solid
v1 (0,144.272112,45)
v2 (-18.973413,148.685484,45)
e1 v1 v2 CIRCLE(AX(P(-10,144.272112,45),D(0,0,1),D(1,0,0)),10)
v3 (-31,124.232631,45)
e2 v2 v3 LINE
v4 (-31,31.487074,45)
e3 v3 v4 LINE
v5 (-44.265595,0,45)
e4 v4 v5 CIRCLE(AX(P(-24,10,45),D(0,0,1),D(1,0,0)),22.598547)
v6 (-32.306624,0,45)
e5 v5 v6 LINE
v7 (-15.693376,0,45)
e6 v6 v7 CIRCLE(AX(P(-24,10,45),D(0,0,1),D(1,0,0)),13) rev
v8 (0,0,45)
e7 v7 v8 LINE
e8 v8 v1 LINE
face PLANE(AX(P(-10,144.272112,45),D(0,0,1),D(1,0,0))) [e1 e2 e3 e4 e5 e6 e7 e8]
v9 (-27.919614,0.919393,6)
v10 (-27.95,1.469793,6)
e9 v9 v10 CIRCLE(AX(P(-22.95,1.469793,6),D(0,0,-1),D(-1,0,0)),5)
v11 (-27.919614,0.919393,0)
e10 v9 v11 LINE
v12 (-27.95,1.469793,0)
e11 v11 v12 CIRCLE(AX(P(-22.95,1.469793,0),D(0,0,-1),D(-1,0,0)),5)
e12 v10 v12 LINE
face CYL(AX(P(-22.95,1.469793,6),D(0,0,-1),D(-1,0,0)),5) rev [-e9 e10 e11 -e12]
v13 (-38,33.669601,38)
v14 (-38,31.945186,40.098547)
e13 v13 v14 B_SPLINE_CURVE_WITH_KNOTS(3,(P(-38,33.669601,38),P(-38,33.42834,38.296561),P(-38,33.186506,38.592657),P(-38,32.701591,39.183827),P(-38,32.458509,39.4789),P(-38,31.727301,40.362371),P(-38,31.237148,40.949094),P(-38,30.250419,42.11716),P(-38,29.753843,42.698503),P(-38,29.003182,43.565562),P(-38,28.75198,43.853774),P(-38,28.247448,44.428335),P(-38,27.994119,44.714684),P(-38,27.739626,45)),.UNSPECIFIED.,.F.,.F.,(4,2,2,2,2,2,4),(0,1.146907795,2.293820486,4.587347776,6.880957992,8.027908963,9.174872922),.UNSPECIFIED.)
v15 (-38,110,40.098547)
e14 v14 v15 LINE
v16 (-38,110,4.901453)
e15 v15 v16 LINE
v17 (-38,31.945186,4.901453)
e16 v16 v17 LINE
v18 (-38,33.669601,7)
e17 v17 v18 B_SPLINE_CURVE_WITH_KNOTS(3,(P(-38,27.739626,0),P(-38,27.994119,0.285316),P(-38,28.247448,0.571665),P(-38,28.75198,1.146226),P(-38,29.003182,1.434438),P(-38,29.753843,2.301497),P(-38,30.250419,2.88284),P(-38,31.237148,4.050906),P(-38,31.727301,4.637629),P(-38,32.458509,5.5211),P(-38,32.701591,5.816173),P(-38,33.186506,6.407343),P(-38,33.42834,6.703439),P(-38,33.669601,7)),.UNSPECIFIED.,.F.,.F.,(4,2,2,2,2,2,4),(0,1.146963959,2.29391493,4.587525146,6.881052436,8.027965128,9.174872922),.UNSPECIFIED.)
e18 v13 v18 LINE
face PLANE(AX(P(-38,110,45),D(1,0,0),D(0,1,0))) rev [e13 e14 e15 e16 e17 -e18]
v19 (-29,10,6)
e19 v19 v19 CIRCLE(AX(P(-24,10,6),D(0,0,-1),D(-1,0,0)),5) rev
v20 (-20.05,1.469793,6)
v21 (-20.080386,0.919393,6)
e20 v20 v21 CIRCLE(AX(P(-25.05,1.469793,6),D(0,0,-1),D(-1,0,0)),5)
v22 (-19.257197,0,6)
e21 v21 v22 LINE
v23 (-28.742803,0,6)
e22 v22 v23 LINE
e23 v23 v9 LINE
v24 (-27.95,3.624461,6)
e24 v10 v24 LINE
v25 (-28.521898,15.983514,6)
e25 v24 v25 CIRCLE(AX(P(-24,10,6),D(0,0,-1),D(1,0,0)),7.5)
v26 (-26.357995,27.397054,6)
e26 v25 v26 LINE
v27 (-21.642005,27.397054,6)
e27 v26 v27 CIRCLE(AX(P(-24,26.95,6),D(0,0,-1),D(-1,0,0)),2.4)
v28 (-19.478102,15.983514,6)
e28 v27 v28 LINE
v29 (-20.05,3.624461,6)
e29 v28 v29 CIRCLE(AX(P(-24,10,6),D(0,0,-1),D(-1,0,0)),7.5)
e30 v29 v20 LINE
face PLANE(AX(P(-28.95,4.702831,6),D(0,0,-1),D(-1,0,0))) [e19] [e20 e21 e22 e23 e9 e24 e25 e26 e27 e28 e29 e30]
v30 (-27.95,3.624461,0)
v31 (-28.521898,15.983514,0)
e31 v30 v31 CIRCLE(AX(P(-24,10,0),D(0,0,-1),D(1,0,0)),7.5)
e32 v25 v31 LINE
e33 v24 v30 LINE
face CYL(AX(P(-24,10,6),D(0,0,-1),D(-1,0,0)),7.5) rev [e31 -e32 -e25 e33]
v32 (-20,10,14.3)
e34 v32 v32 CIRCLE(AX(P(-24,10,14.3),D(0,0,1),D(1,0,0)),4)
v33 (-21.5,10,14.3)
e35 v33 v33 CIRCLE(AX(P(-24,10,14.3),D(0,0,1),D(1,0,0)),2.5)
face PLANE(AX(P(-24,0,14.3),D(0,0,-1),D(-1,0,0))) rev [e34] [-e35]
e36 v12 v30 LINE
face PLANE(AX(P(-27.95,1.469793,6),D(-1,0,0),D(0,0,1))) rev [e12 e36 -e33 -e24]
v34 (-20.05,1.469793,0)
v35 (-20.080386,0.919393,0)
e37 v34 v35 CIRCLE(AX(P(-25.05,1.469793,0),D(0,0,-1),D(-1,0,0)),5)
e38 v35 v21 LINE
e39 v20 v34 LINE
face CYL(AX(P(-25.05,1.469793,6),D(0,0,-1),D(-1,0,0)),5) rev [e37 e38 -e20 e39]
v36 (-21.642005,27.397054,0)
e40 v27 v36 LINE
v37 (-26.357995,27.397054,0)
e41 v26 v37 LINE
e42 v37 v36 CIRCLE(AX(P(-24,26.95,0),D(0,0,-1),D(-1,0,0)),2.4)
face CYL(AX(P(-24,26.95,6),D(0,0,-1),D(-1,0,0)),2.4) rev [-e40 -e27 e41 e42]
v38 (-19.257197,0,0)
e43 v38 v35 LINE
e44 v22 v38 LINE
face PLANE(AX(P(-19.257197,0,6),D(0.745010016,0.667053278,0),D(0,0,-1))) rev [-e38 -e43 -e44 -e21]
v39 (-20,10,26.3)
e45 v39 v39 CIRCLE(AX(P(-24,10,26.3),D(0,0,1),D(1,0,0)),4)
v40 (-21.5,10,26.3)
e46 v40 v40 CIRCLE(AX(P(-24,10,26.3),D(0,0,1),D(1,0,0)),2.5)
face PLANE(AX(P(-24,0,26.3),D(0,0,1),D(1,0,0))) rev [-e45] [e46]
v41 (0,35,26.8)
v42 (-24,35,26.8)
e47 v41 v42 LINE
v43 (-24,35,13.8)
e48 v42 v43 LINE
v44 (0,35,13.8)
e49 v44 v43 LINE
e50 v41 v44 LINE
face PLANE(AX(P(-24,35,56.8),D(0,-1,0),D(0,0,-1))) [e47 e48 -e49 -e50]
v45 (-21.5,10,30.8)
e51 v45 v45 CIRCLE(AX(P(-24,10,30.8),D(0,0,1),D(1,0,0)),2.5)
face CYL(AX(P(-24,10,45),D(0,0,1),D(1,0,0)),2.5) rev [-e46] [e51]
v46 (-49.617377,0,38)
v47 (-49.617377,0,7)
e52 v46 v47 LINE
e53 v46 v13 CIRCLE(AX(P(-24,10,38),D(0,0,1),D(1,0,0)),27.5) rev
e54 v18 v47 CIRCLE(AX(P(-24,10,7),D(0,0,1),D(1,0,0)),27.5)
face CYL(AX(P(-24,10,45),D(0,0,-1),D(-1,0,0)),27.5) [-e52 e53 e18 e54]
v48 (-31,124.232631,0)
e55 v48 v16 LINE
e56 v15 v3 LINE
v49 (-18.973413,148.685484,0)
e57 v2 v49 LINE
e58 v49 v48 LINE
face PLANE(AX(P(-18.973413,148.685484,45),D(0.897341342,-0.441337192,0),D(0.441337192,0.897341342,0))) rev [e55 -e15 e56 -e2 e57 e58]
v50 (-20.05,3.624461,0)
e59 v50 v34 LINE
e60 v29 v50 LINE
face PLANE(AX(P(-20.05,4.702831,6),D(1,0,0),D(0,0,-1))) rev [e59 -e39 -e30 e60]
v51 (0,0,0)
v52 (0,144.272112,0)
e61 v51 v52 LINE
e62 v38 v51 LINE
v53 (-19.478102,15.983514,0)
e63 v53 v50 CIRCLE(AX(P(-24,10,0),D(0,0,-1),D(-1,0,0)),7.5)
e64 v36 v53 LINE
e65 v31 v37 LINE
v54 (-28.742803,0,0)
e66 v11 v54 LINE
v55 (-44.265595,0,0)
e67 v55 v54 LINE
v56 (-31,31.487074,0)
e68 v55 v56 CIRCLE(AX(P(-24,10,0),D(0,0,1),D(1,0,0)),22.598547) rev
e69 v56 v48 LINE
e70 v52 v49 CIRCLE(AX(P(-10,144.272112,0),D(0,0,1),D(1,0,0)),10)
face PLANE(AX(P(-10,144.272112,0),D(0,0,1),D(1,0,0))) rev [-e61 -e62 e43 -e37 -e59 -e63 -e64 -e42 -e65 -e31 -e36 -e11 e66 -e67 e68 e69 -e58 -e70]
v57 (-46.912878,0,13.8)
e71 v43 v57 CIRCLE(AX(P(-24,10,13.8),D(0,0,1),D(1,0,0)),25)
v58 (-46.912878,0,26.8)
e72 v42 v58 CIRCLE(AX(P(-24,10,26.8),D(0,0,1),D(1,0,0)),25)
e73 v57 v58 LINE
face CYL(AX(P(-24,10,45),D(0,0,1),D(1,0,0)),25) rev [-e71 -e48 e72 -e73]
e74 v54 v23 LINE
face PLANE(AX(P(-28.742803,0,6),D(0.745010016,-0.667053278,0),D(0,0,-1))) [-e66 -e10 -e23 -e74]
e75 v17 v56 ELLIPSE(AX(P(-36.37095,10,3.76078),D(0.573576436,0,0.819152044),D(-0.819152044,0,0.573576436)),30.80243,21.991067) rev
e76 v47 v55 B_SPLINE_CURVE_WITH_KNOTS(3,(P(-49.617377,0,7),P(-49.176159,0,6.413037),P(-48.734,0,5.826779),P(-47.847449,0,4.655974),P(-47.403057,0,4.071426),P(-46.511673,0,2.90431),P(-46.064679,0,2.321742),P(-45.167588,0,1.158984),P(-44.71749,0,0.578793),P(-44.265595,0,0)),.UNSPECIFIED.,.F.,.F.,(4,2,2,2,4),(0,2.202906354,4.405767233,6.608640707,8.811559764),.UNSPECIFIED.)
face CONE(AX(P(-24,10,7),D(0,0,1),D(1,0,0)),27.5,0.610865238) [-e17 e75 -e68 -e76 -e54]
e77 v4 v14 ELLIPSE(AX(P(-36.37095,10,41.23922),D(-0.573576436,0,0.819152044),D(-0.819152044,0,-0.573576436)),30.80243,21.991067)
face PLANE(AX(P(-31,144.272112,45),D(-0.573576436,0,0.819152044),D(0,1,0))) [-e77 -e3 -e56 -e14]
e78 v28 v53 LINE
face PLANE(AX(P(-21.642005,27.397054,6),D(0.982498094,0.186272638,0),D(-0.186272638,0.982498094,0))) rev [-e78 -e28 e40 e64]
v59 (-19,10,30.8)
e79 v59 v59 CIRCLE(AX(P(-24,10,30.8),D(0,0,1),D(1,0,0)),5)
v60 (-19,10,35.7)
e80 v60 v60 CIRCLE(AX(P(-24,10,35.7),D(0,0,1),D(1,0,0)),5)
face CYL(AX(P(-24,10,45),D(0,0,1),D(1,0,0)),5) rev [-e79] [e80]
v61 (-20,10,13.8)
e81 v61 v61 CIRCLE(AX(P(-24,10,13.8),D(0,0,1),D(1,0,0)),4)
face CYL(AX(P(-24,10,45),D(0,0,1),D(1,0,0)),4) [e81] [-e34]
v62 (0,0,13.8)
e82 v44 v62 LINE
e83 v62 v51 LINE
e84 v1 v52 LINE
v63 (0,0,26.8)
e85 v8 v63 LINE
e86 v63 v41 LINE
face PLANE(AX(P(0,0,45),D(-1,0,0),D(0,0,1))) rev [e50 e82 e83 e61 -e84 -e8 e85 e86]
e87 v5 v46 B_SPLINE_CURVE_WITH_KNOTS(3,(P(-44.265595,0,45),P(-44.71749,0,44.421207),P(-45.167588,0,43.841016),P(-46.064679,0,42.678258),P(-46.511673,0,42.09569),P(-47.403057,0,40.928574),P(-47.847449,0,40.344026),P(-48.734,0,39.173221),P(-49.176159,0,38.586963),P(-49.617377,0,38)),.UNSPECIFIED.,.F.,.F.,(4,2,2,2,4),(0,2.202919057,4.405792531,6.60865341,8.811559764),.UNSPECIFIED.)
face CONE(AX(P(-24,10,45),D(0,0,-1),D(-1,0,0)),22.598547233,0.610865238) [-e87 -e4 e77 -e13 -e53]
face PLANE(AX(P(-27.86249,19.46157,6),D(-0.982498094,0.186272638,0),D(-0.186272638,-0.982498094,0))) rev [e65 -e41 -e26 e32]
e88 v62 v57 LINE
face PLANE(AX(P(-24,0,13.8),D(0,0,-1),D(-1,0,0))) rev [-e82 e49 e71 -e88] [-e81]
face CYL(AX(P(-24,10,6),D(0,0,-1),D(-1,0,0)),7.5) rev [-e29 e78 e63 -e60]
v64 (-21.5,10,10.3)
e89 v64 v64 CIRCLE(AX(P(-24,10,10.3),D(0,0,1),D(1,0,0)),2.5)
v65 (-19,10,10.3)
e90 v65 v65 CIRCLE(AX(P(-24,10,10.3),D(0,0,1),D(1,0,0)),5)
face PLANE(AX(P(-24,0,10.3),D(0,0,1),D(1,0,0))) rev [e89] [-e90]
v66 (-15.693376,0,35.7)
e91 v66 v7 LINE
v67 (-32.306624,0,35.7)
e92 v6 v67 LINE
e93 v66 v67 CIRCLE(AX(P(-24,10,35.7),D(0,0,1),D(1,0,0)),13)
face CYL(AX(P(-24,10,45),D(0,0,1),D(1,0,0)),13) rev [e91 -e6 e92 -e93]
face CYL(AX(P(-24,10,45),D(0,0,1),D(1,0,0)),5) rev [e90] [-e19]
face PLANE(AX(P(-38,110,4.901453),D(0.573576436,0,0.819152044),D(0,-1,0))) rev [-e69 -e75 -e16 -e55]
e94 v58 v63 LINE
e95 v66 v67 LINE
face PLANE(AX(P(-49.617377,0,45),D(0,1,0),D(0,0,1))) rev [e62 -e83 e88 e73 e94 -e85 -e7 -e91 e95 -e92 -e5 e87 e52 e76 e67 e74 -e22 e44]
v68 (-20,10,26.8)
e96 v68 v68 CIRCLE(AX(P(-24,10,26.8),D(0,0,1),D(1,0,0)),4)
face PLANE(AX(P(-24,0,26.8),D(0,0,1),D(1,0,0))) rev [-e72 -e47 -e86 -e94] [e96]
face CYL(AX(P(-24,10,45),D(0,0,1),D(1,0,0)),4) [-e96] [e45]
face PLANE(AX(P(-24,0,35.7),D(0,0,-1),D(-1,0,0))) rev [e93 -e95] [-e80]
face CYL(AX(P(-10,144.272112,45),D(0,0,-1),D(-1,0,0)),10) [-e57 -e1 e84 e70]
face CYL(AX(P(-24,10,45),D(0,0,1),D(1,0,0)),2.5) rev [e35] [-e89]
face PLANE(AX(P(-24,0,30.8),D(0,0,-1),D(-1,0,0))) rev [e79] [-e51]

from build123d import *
from OCP.BRepFilletAPI import BRepFilletAPI_MakeChamfer

# Parameters (mm, degrees)
EXTRUDE_1_DEPTH     = 45
CHAMFER_1_SIZE      = 7
CHAMFER_1_SIZE2     = 4.901452767
CUT_EXTRUDE_START   = 13
CUT_EXTRUDE_1_DEPTH = 13
CUT_EXTRUDE_2_DEPTH = 6
CUT_EXTRUDE_3_DEPTH = 6
CHAMFER_START       = -1
CHAMFER_2_DEPTH     = 7
CHAMFER_3_SIZE      = 7
CHAMFER_3_SIZE2     = 4.901452767


with BuildPart() as part:
    # 草图1 → 凸台-拉伸1 (new body)
    with BuildSketch(Plane.XY):
        with BuildLine():
            Line((0, 0), (0, 144.272111773))
            ThreePointArc((0, 144.272111773), (-7.734402303, 154.012084416), (-18.973413415, 148.68548369))
            Line((-18.973413415, 148.68548369), (-38, 110))
            Line((-38, 110), (-38, 33.669600757))
            ThreePointArc((-38, 33.669600757), (-49.996050511, 18.969691065), (-49.617376915, 0))
            Line((-49.617376915, 0), (0, 0))
        make_face()
    extrude(amount=EXTRUDE_1_DEPTH)

    # 草图2 → 切除-旋转2 (revolve, cut)
    with BuildSketch(Plane(origin=(-24, 0, 0), x_dir=(0, 0, -1), z_dir=(1, 0, 0)), mode=Mode.PRIVATE) as cut_revolve_2_sk:
        Polygon((-45, 23), (-45, 10), (0, 10), (0, 15), (-4.3, 15), (-10.3, 15), (-10.3, 12.5), (-14.3, 12.5), (-14.3, 14), (-13.8, 14), (-13.8, 35), (-26.8, 35), (-26.8, 14), (-26.3, 14), (-26.3, 12.5), (-30.8, 12.5), (-30.8, 15), (-35.7, 15), (-35.7, 23), align=None)
    revolve(cut_revolve_2_sk.sketch.rotate(Axis((-24, 10, 45), (0, 0, -1)), 90), axis=Axis((-24, 10, 45), (0, 0, -1)), mode=Mode.SUBTRACT)

    # 倒角1
    chamfer_1_edges = [part.edges().sort_by_distance(p)[0] for p in [
        (-49.996050511, 18.969691065, 45),
        (-49.996050511, 18.969691065, 0),
    ]]
    chamfer_1_side = [part.faces().sort_by_distance(p)[0] for p in [
        (-49.996050511, 18.969691065, 22.5),
    ]]
    chamfer(chamfer_1_edges, length=CHAMFER_1_SIZE, length2=CHAMFER_1_SIZE2, reference=chamfer_1_side[0])

    # 草图4 → 切除-拉伸1 (cut)
    with BuildSketch(Plane.XY.offset(13.8).offset(CUT_EXTRUDE_START)):
        with BuildLine():
            Line((-24, 35), (0, 35))
            Line((0, 35), (0, 17))
            ThreePointArc((0, 17), (-9, 30), (-24, 35))
        make_face()
        with BuildLine():
            Line((-1.087121525, 0), (0, 0))
            Line((0, 0), (0, 3))
            ThreePointArc((0, 3), (-0.495648452, 1.482637832), (-1.087121525, 0))
        make_face()
    extrude(amount=-CUT_EXTRUDE_1_DEPTH, mode=Mode.SUBTRACT)

    # 草图7 → 切除-拉伸2 (cut)
    with BuildSketch(Plane(origin=(0, 0, 0), x_dir=(-1, 0, 0), z_dir=(0, 0, -1))):
        with BuildLine():
            Line((27.95, 1.469792729), (27.95, 4.702830945))
            ThreePointArc((27.95, 4.702830945), (28.032732694, 5.101103075), (28.267241379, 5.433474952))
            ThreePointArc((28.267241379, 5.433474952), (30.25, 10), (28.267241379, 14.566525048))
            ThreePointArc((28.267241379, 14.566525048), (28.032732694, 14.898896925), (27.95, 15.297169055))
            Line((27.95, 15.297169055), (27.95, 18.530207271))
            ThreePointArc((27.95, 18.530207271), (27.928074545, 18.997939916), (27.862490469, 19.46157046))
            Line((27.862490469, 19.46157046), (26.357995425, 27.397054331))
            ThreePointArc((26.357995425, 27.397054331), (24, 29.35), (21.642004575, 27.397054331))
            Line((21.642004575, 27.397054331), (20.137509531, 19.46157046))
            ThreePointArc((20.137509531, 19.46157046), (20.071925455, 18.997939916), (20.05, 18.530207271))
            Line((20.05, 18.530207271), (20.05, 15.297169055))
            ThreePointArc((20.05, 15.297169055), (19.967267306, 14.898896925), (19.732758621, 14.566525048))
            ThreePointArc((19.732758621, 14.566525048), (17.75, 10), (19.732758621, 5.433474952))
            ThreePointArc((19.732758621, 5.433474952), (19.967267306, 5.101103075), (20.05, 4.702830945))
            Line((20.05, 4.702830945), (20.05, 1.469792729))
            ThreePointArc((20.05, 1.469792729), (20.071925455, 1.002060084), (20.137509531, 0.53842954))
            Line((20.137509531, 0.53842954), (21.642004575, -7.397054331))
            ThreePointArc((21.642004575, -7.397054331), (24, -9.35), (26.357995425, -7.397054331))
            Line((26.357995425, -7.397054331), (27.862490469, 0.53842954))
            ThreePointArc((27.862490469, 0.53842954), (27.928074545, 1.002060084), (27.95, 1.469792729))
        make_face()
    extrude(amount=-CUT_EXTRUDE_2_DEPTH, mode=Mode.SUBTRACT)

    # 草图9 → 切除-拉伸3 (cut)
    with BuildSketch(Plane(origin=(0, 0, 0), x_dir=(-1, 0, 0), z_dir=(0, 0, -1))):
        with BuildLine():
            Line((20.137509531, 19.46157046), (19.478101846, 15.983513774))
            ThreePointArc((19.478101846, 15.983513774), (16.508016808, 9.653318796), (20.05, 3.624460807))
            Line((20.05, 3.624460807), (27.95, 3.624460807))
            ThreePointArc((27.95, 3.624460807), (31.491983192, 9.653318796), (28.521898154, 15.983513774))
            Line((28.521898154, 15.983513774), (27.862490469, 19.46157046))
            Line((27.862490469, 19.46157046), (20.137509531, 19.46157046))
        make_face()
    extrude(amount=-CUT_EXTRUDE_3_DEPTH, mode=Mode.SUBTRACT)

    # 倒角2: read off the stored shape, not the designer's step
    # 倒角2 outline → 倒角2 (cut)
    with BuildSketch(Plane.XY.offset(CHAMFER_START)):
        with BuildLine():
            Line((-20.239590839, 0), (-19.257196744, 0))
            Line((-19.257196744, 0), (-20.080386265, 0.919393486))
            ThreePointArc((-20.080386265, 0.919393486), (-20.105277636, 0.728361179), (-20.137509531, 0.53842954))
            Line((-20.137509531, 0.53842954), (-20.239590839, 0))
        make_face()
        with BuildLine():
            Line((-28.742803256, 0), (-27.760409161, 0))
            Line((-27.760409161, 0), (-27.862490469, 0.53842954))
            ThreePointArc((-27.862490469, 0.53842954), (-27.894722364, 0.728361179), (-27.919613735, 0.919393486))
            Line((-27.919613735, 0.919393486), (-28.742803256, 0))
        make_face()
    extrude(amount=CHAMFER_2_DEPTH, mode=Mode.SUBTRACT)

    # 倒角3: one chamfer whose edges measure the first distance from different faces: ONE call of the kernel's chamfer builder (chamfer() names one face for all edges)
    chamfer_3_edges_1 = [part.edges().sort_by_distance(p)[0] for p in [
        (-38, 68.86981309, 45),
    ]]
    chamfer_3_side_1 = [part.faces().sort_by_distance(p)[0] for p in [
        (-18.29172725, 74.905702605, 45),
    ]]
    chamfer_3_edges_2 = [part.edges().sort_by_distance(p)[0] for p in [
        (-38, 68.86981309, 0),
    ]]
    chamfer_3_side_2 = [part.faces().sort_by_distance(p)[0] for p in [
        (-18.531236566, 72.11524923, 0),
    ]]
    chamfer_3 = BRepFilletAPI_MakeChamfer(part.part.solid().wrapped)
    for e in chamfer_3_edges_1:
        chamfer_3.Add(CHAMFER_3_SIZE, CHAMFER_3_SIZE2, e.wrapped, chamfer_3_side_1[0].wrapped)  # the first distance lies on this face
    for e in chamfer_3_edges_2:
        chamfer_3.Add(CHAMFER_3_SIZE, CHAMFER_3_SIZE2, e.wrapped, chamfer_3_side_2[0].wrapped)  # the first distance lies on this face
    add(Compound.cast(chamfer_3.Shape()), mode=Mode.REPLACE)


solid = part.part
